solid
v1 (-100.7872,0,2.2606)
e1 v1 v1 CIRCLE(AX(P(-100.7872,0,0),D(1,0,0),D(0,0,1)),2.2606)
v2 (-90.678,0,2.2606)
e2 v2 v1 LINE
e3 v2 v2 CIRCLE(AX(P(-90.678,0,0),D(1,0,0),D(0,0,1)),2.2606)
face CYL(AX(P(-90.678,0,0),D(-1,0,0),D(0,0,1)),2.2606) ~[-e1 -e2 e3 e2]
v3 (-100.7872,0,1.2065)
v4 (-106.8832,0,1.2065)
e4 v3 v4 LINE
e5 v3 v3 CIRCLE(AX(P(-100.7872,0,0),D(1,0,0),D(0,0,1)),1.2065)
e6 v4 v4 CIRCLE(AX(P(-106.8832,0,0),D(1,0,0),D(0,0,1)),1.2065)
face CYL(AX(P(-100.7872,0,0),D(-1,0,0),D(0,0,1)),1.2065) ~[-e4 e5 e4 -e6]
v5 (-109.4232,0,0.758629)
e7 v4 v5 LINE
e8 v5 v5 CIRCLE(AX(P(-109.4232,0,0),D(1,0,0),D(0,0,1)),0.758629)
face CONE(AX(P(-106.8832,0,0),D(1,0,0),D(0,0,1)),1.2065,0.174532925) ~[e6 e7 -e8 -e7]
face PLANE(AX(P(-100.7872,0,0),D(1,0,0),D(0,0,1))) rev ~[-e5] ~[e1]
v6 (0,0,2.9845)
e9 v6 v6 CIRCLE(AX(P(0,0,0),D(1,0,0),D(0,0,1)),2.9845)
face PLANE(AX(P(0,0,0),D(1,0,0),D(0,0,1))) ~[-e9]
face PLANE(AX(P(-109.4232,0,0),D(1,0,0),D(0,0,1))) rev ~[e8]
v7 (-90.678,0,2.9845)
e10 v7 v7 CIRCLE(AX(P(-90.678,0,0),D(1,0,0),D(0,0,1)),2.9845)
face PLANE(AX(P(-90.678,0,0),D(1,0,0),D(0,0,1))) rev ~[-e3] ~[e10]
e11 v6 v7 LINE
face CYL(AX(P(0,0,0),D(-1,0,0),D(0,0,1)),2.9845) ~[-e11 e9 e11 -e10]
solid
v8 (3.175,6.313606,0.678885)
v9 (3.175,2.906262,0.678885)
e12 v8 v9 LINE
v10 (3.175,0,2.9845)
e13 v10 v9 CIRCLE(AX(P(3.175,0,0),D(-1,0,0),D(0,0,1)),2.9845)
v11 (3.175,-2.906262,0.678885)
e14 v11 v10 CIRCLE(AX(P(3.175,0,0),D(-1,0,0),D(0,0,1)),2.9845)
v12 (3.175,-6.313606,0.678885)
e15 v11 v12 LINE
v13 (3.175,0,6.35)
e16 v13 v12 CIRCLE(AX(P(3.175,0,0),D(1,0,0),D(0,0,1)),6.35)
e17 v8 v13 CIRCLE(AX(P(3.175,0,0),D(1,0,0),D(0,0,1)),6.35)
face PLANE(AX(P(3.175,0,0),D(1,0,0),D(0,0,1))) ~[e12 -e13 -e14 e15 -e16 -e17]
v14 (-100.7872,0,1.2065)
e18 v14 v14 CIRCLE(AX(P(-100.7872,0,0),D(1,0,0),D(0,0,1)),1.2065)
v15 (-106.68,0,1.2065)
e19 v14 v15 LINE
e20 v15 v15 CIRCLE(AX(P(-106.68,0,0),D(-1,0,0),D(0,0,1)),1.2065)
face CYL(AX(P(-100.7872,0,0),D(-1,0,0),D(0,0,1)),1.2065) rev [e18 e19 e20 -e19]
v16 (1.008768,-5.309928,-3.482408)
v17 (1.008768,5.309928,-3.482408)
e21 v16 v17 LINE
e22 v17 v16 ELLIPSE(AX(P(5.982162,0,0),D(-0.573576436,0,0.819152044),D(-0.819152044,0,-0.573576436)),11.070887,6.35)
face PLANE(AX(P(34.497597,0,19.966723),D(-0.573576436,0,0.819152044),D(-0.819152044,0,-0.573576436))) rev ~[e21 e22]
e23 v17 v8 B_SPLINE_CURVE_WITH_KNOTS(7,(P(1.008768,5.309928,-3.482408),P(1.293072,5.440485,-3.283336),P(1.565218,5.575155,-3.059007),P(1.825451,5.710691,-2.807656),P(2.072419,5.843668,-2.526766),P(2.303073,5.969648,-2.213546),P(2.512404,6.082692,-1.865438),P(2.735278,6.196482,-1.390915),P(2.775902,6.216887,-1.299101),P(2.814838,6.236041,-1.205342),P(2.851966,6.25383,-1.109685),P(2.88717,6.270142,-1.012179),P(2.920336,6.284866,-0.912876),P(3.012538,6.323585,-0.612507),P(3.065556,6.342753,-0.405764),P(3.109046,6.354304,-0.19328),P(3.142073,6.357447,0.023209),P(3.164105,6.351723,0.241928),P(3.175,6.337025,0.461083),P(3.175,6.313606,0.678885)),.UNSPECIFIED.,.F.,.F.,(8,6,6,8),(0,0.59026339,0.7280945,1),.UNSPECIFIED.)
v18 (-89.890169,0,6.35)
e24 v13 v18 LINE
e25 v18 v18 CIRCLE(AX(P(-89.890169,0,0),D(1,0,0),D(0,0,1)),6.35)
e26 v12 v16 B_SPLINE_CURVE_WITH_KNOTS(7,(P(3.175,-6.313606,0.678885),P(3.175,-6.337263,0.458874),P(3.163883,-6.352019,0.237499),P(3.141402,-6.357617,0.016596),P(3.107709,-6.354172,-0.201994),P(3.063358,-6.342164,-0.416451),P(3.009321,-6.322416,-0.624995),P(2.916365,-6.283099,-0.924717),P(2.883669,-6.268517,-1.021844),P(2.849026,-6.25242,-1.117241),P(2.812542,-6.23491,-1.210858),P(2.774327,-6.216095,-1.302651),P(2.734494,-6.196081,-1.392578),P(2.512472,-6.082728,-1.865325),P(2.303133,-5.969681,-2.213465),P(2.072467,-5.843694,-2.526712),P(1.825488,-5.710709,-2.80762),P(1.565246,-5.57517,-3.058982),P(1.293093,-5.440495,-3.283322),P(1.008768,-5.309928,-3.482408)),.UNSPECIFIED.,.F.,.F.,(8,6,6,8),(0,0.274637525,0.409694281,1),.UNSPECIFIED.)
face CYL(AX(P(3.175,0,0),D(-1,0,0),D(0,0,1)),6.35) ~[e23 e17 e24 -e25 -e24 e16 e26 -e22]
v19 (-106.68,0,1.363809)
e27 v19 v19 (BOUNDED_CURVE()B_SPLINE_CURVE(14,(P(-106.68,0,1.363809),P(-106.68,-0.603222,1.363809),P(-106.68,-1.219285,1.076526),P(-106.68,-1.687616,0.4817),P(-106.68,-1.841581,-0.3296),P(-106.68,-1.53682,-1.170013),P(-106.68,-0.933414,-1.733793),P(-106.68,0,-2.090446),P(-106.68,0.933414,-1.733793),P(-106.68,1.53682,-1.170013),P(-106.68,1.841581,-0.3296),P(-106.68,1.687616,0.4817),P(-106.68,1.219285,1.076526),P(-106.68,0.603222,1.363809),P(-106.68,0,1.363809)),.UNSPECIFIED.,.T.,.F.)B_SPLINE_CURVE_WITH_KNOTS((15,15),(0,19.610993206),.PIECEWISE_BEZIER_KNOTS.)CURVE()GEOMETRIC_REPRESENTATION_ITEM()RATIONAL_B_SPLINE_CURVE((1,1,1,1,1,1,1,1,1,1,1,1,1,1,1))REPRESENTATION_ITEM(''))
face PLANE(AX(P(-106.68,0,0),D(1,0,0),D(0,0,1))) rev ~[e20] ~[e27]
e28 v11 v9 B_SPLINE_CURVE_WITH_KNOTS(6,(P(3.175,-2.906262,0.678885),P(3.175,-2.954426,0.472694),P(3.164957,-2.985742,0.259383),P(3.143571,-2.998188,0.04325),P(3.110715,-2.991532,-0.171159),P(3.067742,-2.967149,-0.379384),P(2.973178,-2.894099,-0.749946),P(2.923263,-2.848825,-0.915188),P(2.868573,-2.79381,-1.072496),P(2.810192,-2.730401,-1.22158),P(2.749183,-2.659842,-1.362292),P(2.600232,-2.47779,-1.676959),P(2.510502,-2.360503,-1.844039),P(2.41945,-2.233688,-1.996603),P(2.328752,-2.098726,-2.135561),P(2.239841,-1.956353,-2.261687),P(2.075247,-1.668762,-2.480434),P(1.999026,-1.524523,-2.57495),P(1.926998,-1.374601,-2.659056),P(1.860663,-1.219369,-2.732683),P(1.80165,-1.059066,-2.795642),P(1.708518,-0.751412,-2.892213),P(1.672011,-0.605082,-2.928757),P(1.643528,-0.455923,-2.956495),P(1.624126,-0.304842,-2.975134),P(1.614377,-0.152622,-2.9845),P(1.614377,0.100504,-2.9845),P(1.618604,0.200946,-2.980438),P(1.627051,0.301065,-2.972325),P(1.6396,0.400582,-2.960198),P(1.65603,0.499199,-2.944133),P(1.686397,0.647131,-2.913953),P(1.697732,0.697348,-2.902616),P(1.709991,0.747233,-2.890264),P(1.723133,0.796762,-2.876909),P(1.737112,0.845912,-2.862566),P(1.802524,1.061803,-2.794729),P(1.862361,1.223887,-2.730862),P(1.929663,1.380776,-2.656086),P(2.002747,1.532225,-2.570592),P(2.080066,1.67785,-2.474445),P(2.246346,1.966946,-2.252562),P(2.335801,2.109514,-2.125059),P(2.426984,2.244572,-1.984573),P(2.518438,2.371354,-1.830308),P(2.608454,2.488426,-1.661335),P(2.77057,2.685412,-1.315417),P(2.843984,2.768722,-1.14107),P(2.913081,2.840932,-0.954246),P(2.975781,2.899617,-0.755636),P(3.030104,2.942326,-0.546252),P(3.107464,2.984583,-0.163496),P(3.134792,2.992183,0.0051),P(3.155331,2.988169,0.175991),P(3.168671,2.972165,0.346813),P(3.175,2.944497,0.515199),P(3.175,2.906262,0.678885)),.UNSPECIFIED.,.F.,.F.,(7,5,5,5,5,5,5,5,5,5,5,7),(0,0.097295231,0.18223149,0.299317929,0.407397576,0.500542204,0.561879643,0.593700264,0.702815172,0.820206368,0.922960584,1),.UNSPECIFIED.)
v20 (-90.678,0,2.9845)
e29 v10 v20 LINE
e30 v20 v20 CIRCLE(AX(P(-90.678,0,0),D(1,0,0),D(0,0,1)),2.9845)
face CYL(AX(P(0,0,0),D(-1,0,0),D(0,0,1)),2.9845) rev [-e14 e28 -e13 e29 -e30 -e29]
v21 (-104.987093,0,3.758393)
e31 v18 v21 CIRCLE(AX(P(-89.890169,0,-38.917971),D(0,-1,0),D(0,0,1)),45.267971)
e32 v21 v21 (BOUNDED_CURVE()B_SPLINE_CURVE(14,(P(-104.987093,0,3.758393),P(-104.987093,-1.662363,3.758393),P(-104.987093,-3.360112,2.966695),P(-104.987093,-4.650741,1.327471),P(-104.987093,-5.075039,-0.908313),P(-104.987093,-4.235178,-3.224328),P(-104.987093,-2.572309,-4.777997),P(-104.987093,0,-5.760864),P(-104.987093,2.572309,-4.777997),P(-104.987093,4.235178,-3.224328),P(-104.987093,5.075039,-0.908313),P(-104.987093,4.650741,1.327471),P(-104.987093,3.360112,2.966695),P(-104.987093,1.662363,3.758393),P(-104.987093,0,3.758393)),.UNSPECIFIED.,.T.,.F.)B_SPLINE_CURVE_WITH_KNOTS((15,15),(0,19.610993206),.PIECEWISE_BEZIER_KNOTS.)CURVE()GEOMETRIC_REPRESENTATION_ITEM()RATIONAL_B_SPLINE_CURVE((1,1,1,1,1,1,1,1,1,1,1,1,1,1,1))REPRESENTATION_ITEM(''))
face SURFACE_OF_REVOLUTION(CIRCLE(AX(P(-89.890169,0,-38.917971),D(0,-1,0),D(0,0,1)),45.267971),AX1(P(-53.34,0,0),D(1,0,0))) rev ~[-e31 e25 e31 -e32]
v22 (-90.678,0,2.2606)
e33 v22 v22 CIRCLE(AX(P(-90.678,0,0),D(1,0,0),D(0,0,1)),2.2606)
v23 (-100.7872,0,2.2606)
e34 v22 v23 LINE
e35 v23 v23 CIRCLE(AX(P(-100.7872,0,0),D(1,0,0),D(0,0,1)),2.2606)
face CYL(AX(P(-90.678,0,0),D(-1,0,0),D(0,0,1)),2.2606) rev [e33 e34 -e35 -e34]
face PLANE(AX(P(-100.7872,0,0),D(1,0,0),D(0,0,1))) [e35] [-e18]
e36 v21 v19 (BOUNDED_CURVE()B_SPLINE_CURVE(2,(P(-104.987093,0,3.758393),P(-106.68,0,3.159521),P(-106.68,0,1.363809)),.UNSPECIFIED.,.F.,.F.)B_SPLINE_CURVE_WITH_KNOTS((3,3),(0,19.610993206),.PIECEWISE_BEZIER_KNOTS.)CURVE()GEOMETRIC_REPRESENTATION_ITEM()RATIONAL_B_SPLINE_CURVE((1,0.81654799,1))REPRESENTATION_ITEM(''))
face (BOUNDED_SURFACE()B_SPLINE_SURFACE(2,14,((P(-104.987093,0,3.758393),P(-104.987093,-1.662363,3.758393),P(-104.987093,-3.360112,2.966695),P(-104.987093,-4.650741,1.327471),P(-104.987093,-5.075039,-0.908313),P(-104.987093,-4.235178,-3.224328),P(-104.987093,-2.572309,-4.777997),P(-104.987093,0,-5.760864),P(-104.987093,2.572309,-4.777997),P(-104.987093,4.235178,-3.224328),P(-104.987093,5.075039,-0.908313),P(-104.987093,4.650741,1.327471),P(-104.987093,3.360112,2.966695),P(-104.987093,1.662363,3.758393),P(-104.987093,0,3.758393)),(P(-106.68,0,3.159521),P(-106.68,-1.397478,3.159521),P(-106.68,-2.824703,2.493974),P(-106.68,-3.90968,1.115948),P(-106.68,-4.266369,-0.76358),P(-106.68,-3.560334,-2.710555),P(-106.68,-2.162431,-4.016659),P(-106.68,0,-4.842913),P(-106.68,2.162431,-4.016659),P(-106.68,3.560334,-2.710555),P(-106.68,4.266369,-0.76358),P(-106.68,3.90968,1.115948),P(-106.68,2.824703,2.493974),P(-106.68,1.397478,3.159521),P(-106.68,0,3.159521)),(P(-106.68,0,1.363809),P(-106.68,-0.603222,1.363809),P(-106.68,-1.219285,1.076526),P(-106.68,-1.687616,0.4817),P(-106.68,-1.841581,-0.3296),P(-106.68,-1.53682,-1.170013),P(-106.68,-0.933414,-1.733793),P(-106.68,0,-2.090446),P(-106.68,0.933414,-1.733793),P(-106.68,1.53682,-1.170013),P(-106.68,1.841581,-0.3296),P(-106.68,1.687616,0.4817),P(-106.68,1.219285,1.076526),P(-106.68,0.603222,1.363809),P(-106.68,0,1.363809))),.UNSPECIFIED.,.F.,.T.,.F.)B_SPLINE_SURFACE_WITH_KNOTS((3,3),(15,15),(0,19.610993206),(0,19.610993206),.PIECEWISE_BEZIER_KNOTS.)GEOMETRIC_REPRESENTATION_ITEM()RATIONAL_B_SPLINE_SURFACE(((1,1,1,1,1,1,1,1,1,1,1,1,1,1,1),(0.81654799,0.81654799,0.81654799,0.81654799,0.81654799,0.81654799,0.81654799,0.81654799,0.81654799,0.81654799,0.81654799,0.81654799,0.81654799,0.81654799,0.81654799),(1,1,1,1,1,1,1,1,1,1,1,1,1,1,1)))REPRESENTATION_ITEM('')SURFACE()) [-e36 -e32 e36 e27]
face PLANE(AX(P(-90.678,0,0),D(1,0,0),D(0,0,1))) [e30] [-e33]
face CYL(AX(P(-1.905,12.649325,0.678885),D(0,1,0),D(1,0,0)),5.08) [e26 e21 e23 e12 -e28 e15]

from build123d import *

# Parameters (mm, degrees)
F5_DEPTH    = 25.4
F7_DEPTH    = 12.7
F8_T1_DEPTH = 17.0147141114
F8_T3_DEPTH = 17.0147141114
F9_SIZE2    = 0.447870531
F9_SIZE     = 2.54
F10_R       = 2.54


# Not quite as in the source:
# - a fillet or chamfer that OpenCascade refuses, or shapes differently, is made with other operations: its cross-section is extruded or revolved along the edge and cut away or added


with BuildPart() as f1:
    # F0 (on Front) → F1 (revolve)
    with BuildSketch(Plane.XZ):
        Polygon((-109.4232, 0), (0, 0), (0, 2.9845), (-90.678, 2.9845), (-90.678, 2.2606), (-100.7872, 2.2606), (-100.7872, 1.5494), (-100.7872, 1.2065), (-109.4232, 1.2065), align=None)
    revolve(axis=Axis((-54.7116, 0, 0), (1, 0, 0)))


with BuildPart() as f3:
    # F2 (on Front) → F3 (revolve)
    with BuildSketch(Plane.XZ):
        with BuildLine():
            Line((0, 6.35), (-89.8901687584, 6.35))
            ThreePointArc((-89.8901687584, 6.35), (-98.4389065262, 5.5354684697), (-106.68, 3.1211865076))
            Line((-106.68, 3.1211865076), (-106.68, 0))
            Line((-106.68, 0), (0, 0))
            Line((0, 0), (3.175, 0))
            Line((3.175, 0), (3.175, 6.35))
            Line((3.175, 6.35), (0, 6.35))
        make_face()
    revolve(axis=Axis((-53.34, 0, 0), (1, 0, 0)))

    # F4: cut F1
    add(f1.part, mode=Mode.SUBTRACT)

    # F5 (cut): a face of the model
    f5_faces = [f1.part.faces().sort_by_distance(p)[0] for p in [
        (0, 0, 0),
    ]]
    extrude(f5_faces, amount=F5_DEPTH, mode=Mode.SUBTRACT)

    # F6 (on Front) → F7 (cut, symmetric)
    with BuildSketch(Plane.XZ):
        Polygon((34.4975971024, 19.9667225742), (-4.445, -7.3011774743), (-4.445, -25.4), (34.4975971024, -25.4), align=None)
    extrude(amount=F7_DEPTH, both=True, mode=Mode.SUBTRACT)

    # F8: fillet of radius 5.08 on 2 edges, made by hand

    # F8_s2 → F8_t1 (cut)
    with BuildSketch(Plane.XZ.offset(-4.3653893316)):
        with BuildLine():
            ThreePointArc((3.175, 0.6788845836), (2.6010150325, -1.6667983716), (1.0087682967, -3.4824078013))
            Line((1.0087682967, -3.4824078013), (3.175, -1.9655960332))
            Line((3.175, -1.9655960332), (3.175, 0.6788845836))
        make_face()
    extrude(amount=F8_T1_DEPTH, mode=Mode.SUBTRACT)

    # F8_s4 → F8_t3 (cut)
    with BuildSketch(Plane.XZ.offset(-12.6493247798)):
        with BuildLine():
            ThreePointArc((3.175, 0.6788845836), (2.6010150325, -1.6667983716), (1.0087682967, -3.4824078013))
            Line((1.0087682967, -3.4824078013), (3.175, -1.9655960332))
            Line((3.175, -1.9655960332), (3.175, 0.6788845836))
        make_face()
    extrude(amount=F8_T3_DEPTH, mode=Mode.SUBTRACT)

    # F10
    f10_edges = [f3.edges().sort_by_distance(p)[0] for p in [
        (-106.68, 0, -3.121187),
    ]]
    fillet(f10_edges, radius=F10_R)


with BuildPart() as f1_1:
    add(f1.part)

    # F9
    f9_edges = [f1_1.edges().sort_by_distance(p)[0] for p in [
        (-109.4232, 0, -1.2065),
    ]]
    chamfer(f9_edges, length=F9_SIZE, length2=F9_SIZE2)


solid = Compound([f3.part, f1_1.part])
